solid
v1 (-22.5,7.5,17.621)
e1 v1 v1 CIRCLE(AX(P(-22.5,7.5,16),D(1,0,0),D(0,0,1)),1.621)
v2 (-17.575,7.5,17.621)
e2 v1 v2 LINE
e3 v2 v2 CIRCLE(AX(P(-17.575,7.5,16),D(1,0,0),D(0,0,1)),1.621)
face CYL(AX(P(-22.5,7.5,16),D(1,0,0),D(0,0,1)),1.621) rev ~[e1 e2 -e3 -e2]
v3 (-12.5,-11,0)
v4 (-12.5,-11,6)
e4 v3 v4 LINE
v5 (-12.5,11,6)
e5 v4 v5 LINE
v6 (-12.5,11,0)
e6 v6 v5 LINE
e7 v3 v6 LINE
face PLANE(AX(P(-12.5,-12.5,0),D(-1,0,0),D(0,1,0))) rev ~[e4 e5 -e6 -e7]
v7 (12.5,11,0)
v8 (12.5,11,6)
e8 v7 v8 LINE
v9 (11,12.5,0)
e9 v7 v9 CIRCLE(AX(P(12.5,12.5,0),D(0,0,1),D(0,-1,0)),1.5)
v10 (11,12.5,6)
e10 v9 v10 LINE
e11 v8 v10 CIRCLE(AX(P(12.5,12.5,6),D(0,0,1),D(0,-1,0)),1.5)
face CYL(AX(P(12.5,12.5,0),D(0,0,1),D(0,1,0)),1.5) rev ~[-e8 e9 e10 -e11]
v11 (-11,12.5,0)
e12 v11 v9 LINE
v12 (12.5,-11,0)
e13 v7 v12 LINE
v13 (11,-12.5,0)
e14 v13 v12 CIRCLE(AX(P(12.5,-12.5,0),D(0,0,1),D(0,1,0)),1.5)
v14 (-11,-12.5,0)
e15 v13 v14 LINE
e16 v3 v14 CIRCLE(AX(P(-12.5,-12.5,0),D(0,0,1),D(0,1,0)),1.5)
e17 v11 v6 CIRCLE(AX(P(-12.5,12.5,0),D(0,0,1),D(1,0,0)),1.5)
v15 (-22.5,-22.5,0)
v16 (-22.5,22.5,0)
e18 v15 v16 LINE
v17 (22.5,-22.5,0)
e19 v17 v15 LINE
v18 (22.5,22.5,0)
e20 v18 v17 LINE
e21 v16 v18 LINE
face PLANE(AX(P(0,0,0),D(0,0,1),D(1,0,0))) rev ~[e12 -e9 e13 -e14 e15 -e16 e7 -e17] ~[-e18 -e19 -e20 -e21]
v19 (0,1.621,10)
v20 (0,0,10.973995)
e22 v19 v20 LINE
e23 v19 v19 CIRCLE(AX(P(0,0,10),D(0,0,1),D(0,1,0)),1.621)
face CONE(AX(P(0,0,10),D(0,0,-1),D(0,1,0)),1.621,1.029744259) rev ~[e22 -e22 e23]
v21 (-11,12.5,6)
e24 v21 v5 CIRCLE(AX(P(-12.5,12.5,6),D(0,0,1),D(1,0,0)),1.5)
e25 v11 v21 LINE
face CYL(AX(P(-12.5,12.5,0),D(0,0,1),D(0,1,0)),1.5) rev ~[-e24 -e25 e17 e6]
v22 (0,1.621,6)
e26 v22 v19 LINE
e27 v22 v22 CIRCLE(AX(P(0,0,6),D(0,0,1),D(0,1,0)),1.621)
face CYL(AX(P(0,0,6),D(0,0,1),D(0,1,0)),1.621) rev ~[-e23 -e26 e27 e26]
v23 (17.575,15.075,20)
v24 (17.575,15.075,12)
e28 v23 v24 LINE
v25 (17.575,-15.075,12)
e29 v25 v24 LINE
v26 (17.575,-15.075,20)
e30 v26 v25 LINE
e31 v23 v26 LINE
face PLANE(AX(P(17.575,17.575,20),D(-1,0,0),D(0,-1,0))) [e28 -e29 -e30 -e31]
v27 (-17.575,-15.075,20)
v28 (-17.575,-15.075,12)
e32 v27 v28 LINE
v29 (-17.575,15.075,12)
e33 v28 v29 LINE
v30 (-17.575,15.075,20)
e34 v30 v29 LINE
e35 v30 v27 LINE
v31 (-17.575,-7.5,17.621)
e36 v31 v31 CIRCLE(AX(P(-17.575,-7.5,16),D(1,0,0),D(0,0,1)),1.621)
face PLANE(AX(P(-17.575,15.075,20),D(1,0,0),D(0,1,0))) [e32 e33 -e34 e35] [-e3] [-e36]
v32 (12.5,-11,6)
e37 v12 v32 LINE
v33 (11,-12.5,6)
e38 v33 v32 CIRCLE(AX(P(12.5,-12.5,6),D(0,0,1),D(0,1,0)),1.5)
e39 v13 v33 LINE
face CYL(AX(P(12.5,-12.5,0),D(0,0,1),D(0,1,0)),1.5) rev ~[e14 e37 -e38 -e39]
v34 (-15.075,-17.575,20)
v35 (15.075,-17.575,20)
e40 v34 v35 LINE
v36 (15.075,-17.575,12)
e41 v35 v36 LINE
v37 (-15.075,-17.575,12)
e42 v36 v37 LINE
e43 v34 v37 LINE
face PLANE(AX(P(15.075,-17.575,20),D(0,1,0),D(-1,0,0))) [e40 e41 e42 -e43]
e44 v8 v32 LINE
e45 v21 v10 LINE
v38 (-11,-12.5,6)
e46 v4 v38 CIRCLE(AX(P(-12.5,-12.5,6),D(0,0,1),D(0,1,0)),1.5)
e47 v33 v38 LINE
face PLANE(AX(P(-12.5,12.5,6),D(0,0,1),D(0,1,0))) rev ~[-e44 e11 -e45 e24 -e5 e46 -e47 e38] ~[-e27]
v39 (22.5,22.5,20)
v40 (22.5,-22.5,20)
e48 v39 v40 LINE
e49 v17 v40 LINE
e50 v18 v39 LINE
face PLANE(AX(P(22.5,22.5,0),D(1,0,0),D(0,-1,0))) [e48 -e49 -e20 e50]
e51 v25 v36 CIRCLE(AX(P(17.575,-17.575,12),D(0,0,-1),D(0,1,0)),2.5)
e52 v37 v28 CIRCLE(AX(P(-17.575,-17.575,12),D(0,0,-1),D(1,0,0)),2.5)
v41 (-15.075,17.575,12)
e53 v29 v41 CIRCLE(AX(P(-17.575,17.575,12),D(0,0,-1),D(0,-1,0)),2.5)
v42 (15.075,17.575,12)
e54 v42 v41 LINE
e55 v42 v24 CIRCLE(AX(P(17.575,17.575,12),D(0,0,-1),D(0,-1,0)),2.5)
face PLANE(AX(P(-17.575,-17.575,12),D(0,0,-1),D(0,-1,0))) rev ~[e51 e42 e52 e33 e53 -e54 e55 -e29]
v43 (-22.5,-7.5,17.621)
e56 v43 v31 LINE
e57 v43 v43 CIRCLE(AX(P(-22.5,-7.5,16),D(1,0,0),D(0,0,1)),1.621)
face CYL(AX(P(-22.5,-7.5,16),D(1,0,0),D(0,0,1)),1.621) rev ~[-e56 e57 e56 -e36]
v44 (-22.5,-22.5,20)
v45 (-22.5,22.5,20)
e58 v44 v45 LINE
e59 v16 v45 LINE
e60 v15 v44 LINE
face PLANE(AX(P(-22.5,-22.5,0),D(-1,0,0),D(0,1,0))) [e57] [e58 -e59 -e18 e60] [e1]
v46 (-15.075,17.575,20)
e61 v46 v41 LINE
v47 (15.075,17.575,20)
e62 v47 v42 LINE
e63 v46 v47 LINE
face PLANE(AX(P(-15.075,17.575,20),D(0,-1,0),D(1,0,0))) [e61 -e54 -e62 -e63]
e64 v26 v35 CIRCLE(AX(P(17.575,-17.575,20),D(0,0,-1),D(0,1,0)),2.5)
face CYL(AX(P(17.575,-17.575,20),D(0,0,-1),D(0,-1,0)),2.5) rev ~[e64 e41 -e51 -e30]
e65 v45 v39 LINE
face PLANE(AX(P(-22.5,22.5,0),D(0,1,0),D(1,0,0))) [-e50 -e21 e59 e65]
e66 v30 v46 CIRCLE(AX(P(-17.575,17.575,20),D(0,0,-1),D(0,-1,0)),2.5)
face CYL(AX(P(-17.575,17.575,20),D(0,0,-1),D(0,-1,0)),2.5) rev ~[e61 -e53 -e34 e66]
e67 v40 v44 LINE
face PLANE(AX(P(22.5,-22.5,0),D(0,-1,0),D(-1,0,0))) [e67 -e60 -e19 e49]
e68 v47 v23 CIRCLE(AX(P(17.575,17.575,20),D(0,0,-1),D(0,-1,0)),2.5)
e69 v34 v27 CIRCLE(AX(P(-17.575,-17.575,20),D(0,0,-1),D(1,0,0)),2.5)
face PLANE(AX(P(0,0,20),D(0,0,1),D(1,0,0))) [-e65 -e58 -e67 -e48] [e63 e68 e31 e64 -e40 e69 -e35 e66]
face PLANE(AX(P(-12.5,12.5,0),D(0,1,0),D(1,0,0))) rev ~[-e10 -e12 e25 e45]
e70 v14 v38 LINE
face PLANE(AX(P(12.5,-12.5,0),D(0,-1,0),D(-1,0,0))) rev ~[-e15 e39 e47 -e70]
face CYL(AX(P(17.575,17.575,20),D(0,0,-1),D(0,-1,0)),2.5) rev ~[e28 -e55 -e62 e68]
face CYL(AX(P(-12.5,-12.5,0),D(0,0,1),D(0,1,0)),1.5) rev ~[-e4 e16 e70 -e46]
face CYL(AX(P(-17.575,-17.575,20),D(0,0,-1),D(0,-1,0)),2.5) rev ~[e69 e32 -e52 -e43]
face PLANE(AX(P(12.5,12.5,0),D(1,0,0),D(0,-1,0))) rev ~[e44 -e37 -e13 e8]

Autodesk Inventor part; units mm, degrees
ref_plane "YZ Plane" through (0, 0, 0) normal (1, 0, 0) x (0, 1, 0)
ref_plane "XZ Plane" through (0, 0, 0) normal (0, 1, 0) x (-1, 0, 0)
ref_plane "XY Plane" through (0, 0, 0) normal (0, 0, 1) x (1, 0, 0)
sketch "Sketch1" plane through (0, 0, 0) normal (0, 0, 1) x (1, 0, 0)
  line L0 (0, 31.5) -> (0, -31.5) construction
  line L1 (-31.5, 0) -> (31.5, 0) construction
  line L2 (-22.5, 22.5) -> (22.5, 22.5)
  line L3 (22.5, 22.5) -> (22.5, -22.5)
  line L4 (22.5, -22.5) -> (-22.5, -22.5)
  line L5 (-22.5, -22.5) -> (-22.5, 22.5)
  point P0 (0, 0)
  dimension "d0" = 45
  dimension "d1" = 45
extrude "Extrusion1" add sketch "Sketch1" along normal blind 20
sketch "Sketch4" plane through (0, 0, 20) normal (0, 0, 1) x (1, 0, 0)
  line L0 (-31.5, 0) -> (31.5, 0) construction
  line L1 (0, 31.5) -> (0, -31.5) construction
  line L2 (-17.575, 17.575) -> (17.575, 17.575) construction
  line L3 (17.575, 17.575) -> (17.575, -17.575) construction
  line L4 (17.575, -17.575) -> (-17.575, -17.575) construction
  line L5 (-17.575, -17.575) -> (-17.575, 17.575) construction
  point P0 (0, 0)
  dimension "d15" = 35.15
  dimension "d16" = 35.15
hole "Hole2" at (-17.575, 17.575, 20) at (17.575, 17.575, 20) at (17.575, -17.575, 20) at (-17.575, -17.575, 20) at (-17.575, 17.575, 20) at (17.575, 17.575, 20) direction (0, 0, -1) diameter 5 depth 8
sketch "Sketch5" plane through (0, 0, 20) normal (0, 0, 1) x (1, 0, 0)
  circle A0 centre (-17.575, 17.575) radius 2.5 projected
  circle A1 centre (17.575, -17.575) radius 2.5 projected
  line L0 (-17.575, 17.575) -> (17.575, 17.575)
  line L1 (17.575, 17.575) -> (17.575, -17.575)
  line L2 (17.575, -17.575) -> (-17.575, -17.575)
  line L3 (-17.575, -17.575) -> (-17.575, 17.575)
  point P0 (0, 0)
extrude "Extrusion3" cut sketch "Sketch5" against normal blind 8 contours L0 L1 A1 L2 L3 A0 | A0 L3 L0 | L1 L2 A1 picked at (-15.9292, 17.3896) picked at (17.028, -16.0118)
sketch "Sketch6" plane through (-22.5, -22.5, 0) normal (-1, 0, 0) x (0, 0, 1)
  line L0 (0, 45) -> (20, 45) projected
  line L1 (0, 0) -> (20, 0) projected
  line L2 (20, 7.425) -> (12, 7.425) construction
  line L3 (20, 37.575) -> (20, 7.425) construction
  line L4 (12, 37.575) -> (20, 37.575) construction
  line L5 (12, 7.425) -> (12, 37.575) construction
  line L6 (16, 37.575) -> (16, 7.425) construction
  point P0 (0, 22.5)
  point P1 (16, 30)
  point P2 (16, 15)
  dimension "d26" = 15
  dimension "d27" = 15
hole "Hole3" at (-22.5, 7.5, 16) at (-22.5, -7.5, 16) direction (1, 0, 0) diameter 3.242 end up to surface thread size "M4x0.7" class "6H" standard "ANSI Metric M Profile"
sketch "Sketch8" plane through (0, 0, 0) normal (0, 0, -1) x (-1, 0, 0)
  line L0 (22.5, 22.5) -> (-22.5, 22.5) construction
  line L1 (-22.5, 22.5) -> (-22.5, -22.5) construction
  line L2 (-22.5, -22.5) -> (22.5, -22.5) construction
  line L3 (22.5, -22.5) -> (22.5, 22.5) construction
  line L4 (0, -38.5) -> (0, 38.5) construction
  line L5 (-38.5, 0) -> (38.5, 0) construction
  line L6 (-12.5, -12.5) -> (12.5, -12.5)
  line L7 (12.5, -12.5) -> (12.5, 12.5)
  line L8 (12.5, 12.5) -> (-12.5, 12.5)
  line L9 (-12.5, 12.5) -> (-12.5, -12.5)
  point P0 (0, 0)
  dimension "d44" = 25
  dimension "d45" = 25
extrude "Extrusion4" cut sketch "Sketch8" against normal blind 6
sketch "Sketch9" plane through (0, 0, 0) normal (0, 0, -1) x (-1, 0, 0)
  line L0 (12.5, 12.5) -> (12.5, -12.5) construction
  line L1 (12.5, -12.5) -> (-12.5, -12.5) construction
  line L2 (-12.5, -12.5) -> (-12.5, 12.5) construction
  line L3 (-12.5, 12.5) -> (12.5, 12.5) construction
  line L4 (22.5, 22.5) -> (-22.5, 22.5) construction
  line L5 (-22.5, 22.5) -> (-22.5, -22.5) construction
  line L6 (-22.5, -22.5) -> (22.5, -22.5) construction
  line L7 (22.5, -22.5) -> (22.5, 22.5) construction
  line L8 (12.5, -12.5) -> (-12.5, -12.5) construction
  point P0 (0, 0)
hole "Hole5" at (-12.5, 12.5, 0) at (-12.5, -12.5, 0) at (12.5, -12.5, 0) at (12.5, 12.5, 0) direction (0, 0, 1) diameter 3 depth 6
sketch "Sketch10" plane through (0, 0, 6) normal (0, 0, -1) x (-1, 0, 0)
  point P0 (0, 0)
  point P1 (0, 0)
hole "Hole6" at (0, 0, 6) direction (0, 0, 1) diameter 3.242 depth 4 tip angle 118 thread size "M4x0.7" class "6H" standard "ANSI Metric M Profile"
properties part number "Large-cuvette-mount-40mm-V3" material "PC/ABS Plastic"
